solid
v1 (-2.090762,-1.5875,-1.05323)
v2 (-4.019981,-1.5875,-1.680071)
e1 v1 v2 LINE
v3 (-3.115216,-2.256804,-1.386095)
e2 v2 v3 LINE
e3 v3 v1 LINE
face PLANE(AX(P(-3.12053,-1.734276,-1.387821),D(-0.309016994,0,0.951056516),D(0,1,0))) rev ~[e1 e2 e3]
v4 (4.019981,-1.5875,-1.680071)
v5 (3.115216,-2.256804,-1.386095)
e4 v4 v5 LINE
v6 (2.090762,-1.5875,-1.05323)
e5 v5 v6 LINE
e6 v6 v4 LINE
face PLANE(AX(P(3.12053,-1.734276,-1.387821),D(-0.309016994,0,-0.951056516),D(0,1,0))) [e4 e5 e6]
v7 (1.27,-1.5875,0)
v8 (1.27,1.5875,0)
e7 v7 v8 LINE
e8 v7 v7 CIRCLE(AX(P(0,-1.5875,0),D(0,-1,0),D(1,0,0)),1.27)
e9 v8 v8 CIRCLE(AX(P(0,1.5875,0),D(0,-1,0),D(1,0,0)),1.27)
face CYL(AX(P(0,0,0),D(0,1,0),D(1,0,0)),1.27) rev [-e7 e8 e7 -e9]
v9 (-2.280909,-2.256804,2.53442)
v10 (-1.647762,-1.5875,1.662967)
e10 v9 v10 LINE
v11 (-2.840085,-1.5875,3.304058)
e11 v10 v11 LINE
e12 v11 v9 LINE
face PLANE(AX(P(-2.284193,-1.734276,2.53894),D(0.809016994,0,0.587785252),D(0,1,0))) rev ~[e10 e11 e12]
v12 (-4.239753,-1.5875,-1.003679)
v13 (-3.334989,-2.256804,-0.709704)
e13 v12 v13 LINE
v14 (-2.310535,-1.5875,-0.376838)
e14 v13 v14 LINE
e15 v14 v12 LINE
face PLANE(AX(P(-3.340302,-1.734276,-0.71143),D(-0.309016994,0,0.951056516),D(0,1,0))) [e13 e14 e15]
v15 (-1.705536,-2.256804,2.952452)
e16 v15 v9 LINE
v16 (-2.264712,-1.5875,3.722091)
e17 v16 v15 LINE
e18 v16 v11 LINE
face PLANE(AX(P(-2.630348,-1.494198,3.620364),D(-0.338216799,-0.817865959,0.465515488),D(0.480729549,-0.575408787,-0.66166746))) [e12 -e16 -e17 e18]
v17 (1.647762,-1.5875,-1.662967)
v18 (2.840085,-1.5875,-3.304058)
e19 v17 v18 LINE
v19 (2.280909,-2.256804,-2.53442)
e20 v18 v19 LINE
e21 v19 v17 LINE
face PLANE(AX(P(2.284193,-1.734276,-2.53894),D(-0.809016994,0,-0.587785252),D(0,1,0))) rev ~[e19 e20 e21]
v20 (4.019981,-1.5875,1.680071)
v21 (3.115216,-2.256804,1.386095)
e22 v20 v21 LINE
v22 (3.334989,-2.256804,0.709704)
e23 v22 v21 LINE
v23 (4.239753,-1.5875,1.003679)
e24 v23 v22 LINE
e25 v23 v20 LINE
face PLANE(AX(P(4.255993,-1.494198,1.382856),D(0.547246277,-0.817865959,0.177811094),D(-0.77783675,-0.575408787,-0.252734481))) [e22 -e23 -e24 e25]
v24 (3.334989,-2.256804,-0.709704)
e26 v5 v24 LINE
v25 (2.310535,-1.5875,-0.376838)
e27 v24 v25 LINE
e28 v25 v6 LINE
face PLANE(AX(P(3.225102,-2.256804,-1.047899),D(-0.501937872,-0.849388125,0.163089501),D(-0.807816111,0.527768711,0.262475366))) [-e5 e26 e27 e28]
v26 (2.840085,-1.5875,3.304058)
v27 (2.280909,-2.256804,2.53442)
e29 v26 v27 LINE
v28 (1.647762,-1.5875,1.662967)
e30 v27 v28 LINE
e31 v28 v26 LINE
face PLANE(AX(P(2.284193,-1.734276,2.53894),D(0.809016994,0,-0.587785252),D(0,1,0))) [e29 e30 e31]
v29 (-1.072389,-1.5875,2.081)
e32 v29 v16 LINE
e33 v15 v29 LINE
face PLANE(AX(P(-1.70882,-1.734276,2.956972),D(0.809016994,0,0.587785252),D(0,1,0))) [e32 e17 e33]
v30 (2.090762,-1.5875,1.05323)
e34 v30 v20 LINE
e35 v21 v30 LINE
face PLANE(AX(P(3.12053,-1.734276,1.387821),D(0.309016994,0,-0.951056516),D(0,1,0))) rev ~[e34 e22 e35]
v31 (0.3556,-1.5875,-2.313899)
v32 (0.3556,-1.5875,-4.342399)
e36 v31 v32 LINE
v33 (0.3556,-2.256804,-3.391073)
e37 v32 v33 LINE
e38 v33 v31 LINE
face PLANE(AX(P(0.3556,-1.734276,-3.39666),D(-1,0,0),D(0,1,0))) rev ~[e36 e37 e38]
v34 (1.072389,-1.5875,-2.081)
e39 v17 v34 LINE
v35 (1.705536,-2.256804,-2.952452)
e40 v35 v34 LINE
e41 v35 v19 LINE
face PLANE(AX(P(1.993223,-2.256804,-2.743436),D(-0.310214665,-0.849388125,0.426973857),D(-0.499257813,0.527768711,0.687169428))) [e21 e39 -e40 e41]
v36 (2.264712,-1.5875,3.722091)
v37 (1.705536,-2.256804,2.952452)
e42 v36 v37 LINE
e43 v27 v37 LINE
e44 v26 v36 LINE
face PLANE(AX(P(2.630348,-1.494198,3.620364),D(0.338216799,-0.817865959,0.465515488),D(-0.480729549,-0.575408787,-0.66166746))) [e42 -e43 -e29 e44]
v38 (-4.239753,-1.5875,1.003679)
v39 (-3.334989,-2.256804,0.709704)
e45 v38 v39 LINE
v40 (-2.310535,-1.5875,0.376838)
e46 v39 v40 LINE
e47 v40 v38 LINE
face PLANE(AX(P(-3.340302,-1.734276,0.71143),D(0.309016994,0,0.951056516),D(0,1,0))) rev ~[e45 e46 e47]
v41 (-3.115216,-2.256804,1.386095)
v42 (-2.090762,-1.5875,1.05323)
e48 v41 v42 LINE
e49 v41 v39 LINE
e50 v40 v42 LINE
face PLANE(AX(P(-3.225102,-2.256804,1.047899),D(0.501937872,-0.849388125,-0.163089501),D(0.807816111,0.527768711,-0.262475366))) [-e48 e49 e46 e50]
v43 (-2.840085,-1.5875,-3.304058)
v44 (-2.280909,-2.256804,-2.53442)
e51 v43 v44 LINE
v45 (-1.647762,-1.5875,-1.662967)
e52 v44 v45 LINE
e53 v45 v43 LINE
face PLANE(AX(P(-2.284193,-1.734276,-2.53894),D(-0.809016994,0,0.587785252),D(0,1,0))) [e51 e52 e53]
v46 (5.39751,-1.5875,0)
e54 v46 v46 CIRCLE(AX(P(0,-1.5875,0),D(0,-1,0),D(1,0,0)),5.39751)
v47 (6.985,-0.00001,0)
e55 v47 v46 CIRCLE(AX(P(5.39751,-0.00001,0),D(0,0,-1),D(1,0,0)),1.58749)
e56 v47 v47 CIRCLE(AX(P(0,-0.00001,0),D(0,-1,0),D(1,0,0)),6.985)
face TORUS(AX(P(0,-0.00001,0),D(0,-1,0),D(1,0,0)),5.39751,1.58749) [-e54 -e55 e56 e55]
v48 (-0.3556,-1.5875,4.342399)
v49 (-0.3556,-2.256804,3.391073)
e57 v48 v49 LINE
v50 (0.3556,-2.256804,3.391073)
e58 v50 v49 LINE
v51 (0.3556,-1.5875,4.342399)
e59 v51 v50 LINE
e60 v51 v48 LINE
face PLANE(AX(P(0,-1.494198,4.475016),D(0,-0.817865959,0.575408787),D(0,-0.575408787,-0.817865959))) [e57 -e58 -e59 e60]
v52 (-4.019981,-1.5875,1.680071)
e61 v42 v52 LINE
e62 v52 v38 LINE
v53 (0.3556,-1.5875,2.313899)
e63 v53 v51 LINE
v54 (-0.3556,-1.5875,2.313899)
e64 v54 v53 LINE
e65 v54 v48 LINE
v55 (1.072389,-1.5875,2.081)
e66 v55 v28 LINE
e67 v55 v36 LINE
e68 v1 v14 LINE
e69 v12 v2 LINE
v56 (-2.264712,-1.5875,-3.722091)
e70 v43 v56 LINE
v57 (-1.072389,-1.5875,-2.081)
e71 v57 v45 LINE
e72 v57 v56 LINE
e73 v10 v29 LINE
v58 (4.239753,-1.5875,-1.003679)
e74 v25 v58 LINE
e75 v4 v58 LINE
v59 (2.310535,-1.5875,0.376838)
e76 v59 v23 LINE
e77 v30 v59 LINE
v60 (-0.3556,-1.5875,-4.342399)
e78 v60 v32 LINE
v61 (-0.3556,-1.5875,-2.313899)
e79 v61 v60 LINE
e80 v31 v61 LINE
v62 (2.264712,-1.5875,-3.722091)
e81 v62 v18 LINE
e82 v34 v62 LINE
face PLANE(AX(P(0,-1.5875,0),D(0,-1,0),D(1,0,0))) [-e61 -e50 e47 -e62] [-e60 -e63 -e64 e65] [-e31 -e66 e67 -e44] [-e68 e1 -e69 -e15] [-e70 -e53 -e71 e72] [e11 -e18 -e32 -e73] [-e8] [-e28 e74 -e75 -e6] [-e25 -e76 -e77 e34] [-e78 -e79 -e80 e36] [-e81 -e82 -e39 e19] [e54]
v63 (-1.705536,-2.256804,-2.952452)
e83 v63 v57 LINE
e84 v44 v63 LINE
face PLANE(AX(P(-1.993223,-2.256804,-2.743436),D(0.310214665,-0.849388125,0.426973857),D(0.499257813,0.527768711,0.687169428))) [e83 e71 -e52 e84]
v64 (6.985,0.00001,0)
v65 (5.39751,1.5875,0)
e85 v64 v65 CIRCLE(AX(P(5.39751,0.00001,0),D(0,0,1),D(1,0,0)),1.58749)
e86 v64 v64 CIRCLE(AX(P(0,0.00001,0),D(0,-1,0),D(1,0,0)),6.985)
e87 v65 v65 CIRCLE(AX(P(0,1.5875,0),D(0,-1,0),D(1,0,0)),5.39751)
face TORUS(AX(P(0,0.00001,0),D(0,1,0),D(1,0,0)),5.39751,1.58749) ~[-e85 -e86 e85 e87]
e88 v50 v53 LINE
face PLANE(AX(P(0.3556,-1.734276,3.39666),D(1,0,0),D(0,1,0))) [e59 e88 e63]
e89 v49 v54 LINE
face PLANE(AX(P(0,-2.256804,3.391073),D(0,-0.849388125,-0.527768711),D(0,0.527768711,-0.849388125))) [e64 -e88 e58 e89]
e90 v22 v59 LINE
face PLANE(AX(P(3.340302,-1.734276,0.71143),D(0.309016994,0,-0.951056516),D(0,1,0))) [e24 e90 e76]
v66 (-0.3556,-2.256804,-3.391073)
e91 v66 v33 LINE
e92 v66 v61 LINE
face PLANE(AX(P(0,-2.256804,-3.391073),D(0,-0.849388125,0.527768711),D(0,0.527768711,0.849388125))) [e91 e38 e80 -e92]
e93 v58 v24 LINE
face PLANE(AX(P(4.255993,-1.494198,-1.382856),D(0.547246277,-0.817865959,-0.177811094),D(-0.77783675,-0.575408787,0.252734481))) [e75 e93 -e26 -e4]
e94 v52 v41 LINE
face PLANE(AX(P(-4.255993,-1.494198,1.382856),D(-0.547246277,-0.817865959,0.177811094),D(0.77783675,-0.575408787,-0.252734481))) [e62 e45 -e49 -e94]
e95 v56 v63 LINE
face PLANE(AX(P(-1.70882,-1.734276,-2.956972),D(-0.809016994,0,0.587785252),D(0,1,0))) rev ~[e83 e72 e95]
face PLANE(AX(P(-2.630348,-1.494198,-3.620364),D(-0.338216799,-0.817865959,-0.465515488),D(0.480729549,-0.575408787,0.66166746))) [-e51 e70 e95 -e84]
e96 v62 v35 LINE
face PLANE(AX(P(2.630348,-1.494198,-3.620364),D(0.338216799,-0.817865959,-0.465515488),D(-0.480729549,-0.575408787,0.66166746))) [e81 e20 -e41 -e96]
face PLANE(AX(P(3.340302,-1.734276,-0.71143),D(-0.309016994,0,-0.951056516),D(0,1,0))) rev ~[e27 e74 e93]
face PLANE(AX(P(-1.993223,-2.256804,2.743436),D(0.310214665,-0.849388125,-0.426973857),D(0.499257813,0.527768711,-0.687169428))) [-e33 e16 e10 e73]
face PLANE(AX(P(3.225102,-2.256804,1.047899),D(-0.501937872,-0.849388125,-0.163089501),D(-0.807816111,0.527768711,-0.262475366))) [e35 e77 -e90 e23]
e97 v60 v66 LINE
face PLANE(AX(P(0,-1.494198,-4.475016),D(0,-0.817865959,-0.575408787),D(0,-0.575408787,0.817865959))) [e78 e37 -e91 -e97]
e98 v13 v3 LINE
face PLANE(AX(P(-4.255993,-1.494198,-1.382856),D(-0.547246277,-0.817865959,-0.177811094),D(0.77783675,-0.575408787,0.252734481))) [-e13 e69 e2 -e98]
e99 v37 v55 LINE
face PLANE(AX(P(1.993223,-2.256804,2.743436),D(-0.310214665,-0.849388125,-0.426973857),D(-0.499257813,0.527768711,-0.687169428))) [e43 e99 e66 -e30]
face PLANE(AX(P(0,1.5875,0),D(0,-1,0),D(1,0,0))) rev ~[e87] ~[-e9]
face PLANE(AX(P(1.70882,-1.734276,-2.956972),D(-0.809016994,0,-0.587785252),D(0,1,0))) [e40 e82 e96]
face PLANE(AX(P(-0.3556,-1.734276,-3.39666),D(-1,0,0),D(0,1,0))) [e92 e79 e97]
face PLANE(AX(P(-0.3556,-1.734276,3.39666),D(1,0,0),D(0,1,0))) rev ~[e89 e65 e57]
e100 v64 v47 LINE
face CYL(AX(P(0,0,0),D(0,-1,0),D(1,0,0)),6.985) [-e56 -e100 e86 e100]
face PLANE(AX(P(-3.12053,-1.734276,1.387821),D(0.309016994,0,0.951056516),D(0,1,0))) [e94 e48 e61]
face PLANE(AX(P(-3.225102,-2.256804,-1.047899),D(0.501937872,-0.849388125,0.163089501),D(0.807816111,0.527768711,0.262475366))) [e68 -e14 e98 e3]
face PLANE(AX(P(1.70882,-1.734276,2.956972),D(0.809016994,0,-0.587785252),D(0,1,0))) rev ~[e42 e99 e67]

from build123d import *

# Parameters (mm, degrees)
F0_R     = 6.985
F0_R_2   = 1.27
F1_DEPTH = 1.5875
F2_R     = 1.58749
F4_DEPTH = 0.3556
F5_COUNT = 10


# Not quite as in the source:
# - a fillet or chamfer is up to 0.001 mm smaller than in the source, because OpenCascade refuses the exact size


with BuildPart() as f1:
    # F0 (on Front) → F1 (new body, symmetric)
    with BuildSketch(Plane.XZ):
        Circle(F0_R)
        Circle(F0_R_2, mode=Mode.SUBTRACT)
    extrude(amount=F1_DEPTH, both=True)

    # F2 (radius 1.5875 in the source; OpenCascade refuses exactly that, so slightly less here)
    f2_edges = [f1.edges().sort_by_distance(p)[0] for p in [
        (-6.985, 1.5875, 0),
        (-6.985, -1.5875, 0),
    ]]
    fillet(f2_edges, radius=F2_R)

    # F3 (on Right) → F4 (join, symmetric)
    with BuildSketch(Plane.YZ):
        Polygon((-1.5832948266, 2.3071307223), (-1.4941976026, 4.4750159141), (-2.2568043449, 3.3910733182), align=None)
    f4 = extrude(amount=F4_DEPTH, both=True)

    # F5: F4 ×10 about axis
    f5_axis = Axis((0, -1.5875, 0), (0, -1, 0))
    for i in range(1, F5_COUNT):
        add(f4.rotate(f5_axis, i * 360 / F5_COUNT))


solid = f1.part
